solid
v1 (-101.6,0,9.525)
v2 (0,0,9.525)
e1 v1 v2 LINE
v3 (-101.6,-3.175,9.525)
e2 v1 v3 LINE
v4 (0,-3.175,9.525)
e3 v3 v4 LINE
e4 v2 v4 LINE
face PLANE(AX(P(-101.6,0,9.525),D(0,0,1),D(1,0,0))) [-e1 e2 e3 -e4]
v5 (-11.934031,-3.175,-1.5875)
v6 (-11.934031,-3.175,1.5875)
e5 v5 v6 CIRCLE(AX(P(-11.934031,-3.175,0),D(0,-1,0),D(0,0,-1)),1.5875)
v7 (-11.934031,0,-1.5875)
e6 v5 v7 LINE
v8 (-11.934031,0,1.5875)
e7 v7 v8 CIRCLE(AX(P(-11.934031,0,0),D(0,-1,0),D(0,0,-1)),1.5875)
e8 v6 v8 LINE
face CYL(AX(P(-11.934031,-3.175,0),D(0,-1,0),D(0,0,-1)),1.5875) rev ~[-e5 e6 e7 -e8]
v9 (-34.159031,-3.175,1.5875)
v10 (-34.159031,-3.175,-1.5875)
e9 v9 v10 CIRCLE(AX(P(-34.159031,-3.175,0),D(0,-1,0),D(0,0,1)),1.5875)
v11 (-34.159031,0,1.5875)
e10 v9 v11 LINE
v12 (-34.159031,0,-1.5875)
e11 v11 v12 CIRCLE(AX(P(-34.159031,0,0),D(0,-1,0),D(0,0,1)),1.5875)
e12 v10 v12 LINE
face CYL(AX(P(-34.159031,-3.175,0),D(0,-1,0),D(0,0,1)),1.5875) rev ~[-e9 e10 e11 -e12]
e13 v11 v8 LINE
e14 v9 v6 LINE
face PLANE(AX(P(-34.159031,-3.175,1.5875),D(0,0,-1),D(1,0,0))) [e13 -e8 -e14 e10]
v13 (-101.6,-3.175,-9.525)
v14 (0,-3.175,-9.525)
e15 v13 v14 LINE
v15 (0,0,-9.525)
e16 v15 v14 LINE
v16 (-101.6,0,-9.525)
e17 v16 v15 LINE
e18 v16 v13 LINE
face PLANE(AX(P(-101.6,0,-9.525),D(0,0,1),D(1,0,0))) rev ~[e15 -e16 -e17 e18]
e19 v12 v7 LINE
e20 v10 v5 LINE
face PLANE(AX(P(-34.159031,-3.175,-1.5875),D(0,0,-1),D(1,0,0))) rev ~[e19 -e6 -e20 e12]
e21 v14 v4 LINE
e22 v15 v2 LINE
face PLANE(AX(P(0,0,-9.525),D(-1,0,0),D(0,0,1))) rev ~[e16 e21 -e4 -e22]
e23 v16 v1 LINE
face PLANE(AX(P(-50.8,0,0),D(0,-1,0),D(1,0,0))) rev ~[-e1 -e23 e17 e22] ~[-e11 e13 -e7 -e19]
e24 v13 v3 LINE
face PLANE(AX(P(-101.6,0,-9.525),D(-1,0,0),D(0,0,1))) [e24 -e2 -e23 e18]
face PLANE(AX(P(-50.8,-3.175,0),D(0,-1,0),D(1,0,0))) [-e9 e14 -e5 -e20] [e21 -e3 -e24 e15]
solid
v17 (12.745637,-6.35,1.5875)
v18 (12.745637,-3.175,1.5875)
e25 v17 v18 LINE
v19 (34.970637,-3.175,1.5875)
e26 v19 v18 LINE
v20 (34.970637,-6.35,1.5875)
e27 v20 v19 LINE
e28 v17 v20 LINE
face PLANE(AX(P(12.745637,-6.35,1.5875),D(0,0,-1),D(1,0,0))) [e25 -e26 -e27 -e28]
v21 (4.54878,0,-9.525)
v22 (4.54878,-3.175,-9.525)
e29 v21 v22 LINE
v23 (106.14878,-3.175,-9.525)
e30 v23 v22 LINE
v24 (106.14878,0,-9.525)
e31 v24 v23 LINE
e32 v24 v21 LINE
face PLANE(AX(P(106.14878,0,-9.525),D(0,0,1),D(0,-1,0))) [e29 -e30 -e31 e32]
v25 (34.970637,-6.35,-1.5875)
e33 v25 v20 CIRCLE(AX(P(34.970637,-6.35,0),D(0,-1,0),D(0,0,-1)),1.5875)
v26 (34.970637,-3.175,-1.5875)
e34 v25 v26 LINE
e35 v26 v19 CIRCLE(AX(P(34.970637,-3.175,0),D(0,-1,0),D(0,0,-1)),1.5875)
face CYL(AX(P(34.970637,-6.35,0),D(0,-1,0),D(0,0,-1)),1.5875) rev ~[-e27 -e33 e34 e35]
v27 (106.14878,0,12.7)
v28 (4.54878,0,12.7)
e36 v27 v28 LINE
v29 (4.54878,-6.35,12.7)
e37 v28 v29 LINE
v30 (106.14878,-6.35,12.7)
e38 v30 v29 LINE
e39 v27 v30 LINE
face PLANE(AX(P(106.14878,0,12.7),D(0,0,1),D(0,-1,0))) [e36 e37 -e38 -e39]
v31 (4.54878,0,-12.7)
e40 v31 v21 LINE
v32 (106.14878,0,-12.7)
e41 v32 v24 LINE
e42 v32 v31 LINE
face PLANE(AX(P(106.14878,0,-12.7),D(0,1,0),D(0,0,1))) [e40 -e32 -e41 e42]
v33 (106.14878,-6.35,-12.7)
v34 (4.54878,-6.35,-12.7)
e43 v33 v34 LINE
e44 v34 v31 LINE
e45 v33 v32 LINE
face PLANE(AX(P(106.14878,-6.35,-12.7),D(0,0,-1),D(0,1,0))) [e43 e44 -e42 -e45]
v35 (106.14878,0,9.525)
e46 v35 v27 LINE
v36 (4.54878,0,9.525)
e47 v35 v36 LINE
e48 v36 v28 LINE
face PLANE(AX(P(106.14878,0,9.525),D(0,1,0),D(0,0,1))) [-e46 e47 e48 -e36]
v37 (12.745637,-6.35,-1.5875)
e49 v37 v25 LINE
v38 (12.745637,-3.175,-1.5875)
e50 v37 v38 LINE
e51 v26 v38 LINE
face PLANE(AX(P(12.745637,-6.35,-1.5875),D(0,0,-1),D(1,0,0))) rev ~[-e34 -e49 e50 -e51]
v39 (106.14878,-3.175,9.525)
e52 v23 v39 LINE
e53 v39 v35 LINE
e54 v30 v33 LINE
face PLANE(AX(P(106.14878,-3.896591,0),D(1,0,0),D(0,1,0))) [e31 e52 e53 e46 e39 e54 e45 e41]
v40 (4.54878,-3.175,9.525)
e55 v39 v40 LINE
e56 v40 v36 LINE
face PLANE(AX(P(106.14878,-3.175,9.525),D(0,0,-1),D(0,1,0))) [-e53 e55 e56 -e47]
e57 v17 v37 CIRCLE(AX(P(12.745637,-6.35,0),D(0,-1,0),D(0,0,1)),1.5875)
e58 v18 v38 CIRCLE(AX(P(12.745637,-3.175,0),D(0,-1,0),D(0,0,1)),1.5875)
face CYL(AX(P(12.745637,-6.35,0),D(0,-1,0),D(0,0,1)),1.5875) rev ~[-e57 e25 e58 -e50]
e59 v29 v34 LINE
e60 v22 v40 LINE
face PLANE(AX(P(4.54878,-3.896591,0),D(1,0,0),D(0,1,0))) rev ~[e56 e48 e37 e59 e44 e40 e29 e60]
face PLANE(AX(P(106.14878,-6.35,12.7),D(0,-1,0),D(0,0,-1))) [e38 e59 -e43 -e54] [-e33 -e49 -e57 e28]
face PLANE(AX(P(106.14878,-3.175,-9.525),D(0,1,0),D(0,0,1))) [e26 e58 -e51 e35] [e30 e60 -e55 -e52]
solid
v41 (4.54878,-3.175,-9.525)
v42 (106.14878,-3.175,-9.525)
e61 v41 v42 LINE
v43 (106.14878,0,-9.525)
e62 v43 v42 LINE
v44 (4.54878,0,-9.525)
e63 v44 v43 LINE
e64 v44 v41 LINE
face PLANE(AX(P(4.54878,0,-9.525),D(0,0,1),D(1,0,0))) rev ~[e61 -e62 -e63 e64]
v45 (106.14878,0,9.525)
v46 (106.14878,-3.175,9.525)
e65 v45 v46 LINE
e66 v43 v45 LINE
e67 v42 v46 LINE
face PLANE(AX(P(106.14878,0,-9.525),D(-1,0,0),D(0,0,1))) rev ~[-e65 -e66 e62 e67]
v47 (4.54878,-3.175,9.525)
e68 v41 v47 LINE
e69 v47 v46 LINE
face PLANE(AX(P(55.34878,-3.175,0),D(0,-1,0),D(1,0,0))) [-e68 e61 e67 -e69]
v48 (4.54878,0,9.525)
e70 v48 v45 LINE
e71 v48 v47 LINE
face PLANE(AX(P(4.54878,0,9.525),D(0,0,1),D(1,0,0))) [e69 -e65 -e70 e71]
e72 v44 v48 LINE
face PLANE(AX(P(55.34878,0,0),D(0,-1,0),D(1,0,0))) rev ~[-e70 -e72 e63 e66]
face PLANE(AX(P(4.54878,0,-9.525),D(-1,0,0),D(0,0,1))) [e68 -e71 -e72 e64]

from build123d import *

# Parameters (mm, degrees)
F0_W     = 101.6
F0_H     = 19.05
F1_DEPTH = 3.175
F4_DEPTH = 101.6
F5_W     = 22.225
F5_H     = 3.175
F6_DEPTH = 3.176
F7_W     = 22.225
F7_H     = 3.175
F8_DEPTH = 25.4


with BuildPart() as f1:
    # F0 (on Front) → F1 (new body)
    with BuildSketch(Plane.XZ):
        with Locations((-50.8, 0)):
            Rectangle(F0_W, F0_H)
    extrude(amount=F1_DEPTH)


with BuildPart() as f2_1:
    # F2: copy of F1
    add(f1.part.moved(Location((106.14878, 0, 0))))


with BuildPart() as f4:
    # F3 (on face) → F4 (new body, through all)
    with BuildSketch(Plane.YZ.offset(106.14878)):
        Polygon((0, -12.7), (0, -9.525), (-3.175, -9.525), (-3.175, 9.525), (0, 9.525), (0, 12.7), (-6.35, 12.7), (-6.35, -12.7), align=None)
    extrude(amount=-F4_DEPTH)

    # F7 (on face) → F8 (cut)
    with BuildSketch(Plane.XZ.offset(6.35)):
        with Locations((23.8581371099, 0)):
            Rectangle(F7_W, F7_H)
        with BuildLine():
            Line((12.7456371099, -1.5875), (12.7456371099, 1.5875))
            ThreePointArc((12.7456371099, 1.5875), (11.1581371099, 0), (12.7456371099, -1.5875))
        make_face()
        with BuildLine():
            ThreePointArc((34.9706371099, -1.5875), (36.5581371099, 0), (34.9706371099, 1.5875))
            Line((34.9706371099, 1.5875), (34.9706371099, -1.5875))
        make_face()
    extrude(amount=-F8_DEPTH, mode=Mode.SUBTRACT)


with BuildPart() as f1_1:
    add(f1.part)

    # F5 (on face) → F6 (cut, through all)
    with BuildSketch(Plane.XZ.offset(3.175)):
        with Locations((-23.0465307151, 0)):
            Rectangle(F5_W, F5_H)
        with BuildLine():
            Line((-34.1590307151, -1.5875), (-34.1590307151, 1.5875))
            ThreePointArc((-34.1590307151, 1.5875), (-35.7465307151, 0), (-34.1590307151, -1.5875))
        make_face()
        with BuildLine():
            ThreePointArc((-11.9340307151, -1.5875), (-10.3465307151, 0), (-11.9340307151, 1.5875))
            Line((-11.9340307151, 1.5875), (-11.9340307151, -1.5875))
        make_face()
    extrude(amount=-F6_DEPTH, mode=Mode.SUBTRACT)


solid = Compound([f2_1.part, f4.part, f1_1.part])
